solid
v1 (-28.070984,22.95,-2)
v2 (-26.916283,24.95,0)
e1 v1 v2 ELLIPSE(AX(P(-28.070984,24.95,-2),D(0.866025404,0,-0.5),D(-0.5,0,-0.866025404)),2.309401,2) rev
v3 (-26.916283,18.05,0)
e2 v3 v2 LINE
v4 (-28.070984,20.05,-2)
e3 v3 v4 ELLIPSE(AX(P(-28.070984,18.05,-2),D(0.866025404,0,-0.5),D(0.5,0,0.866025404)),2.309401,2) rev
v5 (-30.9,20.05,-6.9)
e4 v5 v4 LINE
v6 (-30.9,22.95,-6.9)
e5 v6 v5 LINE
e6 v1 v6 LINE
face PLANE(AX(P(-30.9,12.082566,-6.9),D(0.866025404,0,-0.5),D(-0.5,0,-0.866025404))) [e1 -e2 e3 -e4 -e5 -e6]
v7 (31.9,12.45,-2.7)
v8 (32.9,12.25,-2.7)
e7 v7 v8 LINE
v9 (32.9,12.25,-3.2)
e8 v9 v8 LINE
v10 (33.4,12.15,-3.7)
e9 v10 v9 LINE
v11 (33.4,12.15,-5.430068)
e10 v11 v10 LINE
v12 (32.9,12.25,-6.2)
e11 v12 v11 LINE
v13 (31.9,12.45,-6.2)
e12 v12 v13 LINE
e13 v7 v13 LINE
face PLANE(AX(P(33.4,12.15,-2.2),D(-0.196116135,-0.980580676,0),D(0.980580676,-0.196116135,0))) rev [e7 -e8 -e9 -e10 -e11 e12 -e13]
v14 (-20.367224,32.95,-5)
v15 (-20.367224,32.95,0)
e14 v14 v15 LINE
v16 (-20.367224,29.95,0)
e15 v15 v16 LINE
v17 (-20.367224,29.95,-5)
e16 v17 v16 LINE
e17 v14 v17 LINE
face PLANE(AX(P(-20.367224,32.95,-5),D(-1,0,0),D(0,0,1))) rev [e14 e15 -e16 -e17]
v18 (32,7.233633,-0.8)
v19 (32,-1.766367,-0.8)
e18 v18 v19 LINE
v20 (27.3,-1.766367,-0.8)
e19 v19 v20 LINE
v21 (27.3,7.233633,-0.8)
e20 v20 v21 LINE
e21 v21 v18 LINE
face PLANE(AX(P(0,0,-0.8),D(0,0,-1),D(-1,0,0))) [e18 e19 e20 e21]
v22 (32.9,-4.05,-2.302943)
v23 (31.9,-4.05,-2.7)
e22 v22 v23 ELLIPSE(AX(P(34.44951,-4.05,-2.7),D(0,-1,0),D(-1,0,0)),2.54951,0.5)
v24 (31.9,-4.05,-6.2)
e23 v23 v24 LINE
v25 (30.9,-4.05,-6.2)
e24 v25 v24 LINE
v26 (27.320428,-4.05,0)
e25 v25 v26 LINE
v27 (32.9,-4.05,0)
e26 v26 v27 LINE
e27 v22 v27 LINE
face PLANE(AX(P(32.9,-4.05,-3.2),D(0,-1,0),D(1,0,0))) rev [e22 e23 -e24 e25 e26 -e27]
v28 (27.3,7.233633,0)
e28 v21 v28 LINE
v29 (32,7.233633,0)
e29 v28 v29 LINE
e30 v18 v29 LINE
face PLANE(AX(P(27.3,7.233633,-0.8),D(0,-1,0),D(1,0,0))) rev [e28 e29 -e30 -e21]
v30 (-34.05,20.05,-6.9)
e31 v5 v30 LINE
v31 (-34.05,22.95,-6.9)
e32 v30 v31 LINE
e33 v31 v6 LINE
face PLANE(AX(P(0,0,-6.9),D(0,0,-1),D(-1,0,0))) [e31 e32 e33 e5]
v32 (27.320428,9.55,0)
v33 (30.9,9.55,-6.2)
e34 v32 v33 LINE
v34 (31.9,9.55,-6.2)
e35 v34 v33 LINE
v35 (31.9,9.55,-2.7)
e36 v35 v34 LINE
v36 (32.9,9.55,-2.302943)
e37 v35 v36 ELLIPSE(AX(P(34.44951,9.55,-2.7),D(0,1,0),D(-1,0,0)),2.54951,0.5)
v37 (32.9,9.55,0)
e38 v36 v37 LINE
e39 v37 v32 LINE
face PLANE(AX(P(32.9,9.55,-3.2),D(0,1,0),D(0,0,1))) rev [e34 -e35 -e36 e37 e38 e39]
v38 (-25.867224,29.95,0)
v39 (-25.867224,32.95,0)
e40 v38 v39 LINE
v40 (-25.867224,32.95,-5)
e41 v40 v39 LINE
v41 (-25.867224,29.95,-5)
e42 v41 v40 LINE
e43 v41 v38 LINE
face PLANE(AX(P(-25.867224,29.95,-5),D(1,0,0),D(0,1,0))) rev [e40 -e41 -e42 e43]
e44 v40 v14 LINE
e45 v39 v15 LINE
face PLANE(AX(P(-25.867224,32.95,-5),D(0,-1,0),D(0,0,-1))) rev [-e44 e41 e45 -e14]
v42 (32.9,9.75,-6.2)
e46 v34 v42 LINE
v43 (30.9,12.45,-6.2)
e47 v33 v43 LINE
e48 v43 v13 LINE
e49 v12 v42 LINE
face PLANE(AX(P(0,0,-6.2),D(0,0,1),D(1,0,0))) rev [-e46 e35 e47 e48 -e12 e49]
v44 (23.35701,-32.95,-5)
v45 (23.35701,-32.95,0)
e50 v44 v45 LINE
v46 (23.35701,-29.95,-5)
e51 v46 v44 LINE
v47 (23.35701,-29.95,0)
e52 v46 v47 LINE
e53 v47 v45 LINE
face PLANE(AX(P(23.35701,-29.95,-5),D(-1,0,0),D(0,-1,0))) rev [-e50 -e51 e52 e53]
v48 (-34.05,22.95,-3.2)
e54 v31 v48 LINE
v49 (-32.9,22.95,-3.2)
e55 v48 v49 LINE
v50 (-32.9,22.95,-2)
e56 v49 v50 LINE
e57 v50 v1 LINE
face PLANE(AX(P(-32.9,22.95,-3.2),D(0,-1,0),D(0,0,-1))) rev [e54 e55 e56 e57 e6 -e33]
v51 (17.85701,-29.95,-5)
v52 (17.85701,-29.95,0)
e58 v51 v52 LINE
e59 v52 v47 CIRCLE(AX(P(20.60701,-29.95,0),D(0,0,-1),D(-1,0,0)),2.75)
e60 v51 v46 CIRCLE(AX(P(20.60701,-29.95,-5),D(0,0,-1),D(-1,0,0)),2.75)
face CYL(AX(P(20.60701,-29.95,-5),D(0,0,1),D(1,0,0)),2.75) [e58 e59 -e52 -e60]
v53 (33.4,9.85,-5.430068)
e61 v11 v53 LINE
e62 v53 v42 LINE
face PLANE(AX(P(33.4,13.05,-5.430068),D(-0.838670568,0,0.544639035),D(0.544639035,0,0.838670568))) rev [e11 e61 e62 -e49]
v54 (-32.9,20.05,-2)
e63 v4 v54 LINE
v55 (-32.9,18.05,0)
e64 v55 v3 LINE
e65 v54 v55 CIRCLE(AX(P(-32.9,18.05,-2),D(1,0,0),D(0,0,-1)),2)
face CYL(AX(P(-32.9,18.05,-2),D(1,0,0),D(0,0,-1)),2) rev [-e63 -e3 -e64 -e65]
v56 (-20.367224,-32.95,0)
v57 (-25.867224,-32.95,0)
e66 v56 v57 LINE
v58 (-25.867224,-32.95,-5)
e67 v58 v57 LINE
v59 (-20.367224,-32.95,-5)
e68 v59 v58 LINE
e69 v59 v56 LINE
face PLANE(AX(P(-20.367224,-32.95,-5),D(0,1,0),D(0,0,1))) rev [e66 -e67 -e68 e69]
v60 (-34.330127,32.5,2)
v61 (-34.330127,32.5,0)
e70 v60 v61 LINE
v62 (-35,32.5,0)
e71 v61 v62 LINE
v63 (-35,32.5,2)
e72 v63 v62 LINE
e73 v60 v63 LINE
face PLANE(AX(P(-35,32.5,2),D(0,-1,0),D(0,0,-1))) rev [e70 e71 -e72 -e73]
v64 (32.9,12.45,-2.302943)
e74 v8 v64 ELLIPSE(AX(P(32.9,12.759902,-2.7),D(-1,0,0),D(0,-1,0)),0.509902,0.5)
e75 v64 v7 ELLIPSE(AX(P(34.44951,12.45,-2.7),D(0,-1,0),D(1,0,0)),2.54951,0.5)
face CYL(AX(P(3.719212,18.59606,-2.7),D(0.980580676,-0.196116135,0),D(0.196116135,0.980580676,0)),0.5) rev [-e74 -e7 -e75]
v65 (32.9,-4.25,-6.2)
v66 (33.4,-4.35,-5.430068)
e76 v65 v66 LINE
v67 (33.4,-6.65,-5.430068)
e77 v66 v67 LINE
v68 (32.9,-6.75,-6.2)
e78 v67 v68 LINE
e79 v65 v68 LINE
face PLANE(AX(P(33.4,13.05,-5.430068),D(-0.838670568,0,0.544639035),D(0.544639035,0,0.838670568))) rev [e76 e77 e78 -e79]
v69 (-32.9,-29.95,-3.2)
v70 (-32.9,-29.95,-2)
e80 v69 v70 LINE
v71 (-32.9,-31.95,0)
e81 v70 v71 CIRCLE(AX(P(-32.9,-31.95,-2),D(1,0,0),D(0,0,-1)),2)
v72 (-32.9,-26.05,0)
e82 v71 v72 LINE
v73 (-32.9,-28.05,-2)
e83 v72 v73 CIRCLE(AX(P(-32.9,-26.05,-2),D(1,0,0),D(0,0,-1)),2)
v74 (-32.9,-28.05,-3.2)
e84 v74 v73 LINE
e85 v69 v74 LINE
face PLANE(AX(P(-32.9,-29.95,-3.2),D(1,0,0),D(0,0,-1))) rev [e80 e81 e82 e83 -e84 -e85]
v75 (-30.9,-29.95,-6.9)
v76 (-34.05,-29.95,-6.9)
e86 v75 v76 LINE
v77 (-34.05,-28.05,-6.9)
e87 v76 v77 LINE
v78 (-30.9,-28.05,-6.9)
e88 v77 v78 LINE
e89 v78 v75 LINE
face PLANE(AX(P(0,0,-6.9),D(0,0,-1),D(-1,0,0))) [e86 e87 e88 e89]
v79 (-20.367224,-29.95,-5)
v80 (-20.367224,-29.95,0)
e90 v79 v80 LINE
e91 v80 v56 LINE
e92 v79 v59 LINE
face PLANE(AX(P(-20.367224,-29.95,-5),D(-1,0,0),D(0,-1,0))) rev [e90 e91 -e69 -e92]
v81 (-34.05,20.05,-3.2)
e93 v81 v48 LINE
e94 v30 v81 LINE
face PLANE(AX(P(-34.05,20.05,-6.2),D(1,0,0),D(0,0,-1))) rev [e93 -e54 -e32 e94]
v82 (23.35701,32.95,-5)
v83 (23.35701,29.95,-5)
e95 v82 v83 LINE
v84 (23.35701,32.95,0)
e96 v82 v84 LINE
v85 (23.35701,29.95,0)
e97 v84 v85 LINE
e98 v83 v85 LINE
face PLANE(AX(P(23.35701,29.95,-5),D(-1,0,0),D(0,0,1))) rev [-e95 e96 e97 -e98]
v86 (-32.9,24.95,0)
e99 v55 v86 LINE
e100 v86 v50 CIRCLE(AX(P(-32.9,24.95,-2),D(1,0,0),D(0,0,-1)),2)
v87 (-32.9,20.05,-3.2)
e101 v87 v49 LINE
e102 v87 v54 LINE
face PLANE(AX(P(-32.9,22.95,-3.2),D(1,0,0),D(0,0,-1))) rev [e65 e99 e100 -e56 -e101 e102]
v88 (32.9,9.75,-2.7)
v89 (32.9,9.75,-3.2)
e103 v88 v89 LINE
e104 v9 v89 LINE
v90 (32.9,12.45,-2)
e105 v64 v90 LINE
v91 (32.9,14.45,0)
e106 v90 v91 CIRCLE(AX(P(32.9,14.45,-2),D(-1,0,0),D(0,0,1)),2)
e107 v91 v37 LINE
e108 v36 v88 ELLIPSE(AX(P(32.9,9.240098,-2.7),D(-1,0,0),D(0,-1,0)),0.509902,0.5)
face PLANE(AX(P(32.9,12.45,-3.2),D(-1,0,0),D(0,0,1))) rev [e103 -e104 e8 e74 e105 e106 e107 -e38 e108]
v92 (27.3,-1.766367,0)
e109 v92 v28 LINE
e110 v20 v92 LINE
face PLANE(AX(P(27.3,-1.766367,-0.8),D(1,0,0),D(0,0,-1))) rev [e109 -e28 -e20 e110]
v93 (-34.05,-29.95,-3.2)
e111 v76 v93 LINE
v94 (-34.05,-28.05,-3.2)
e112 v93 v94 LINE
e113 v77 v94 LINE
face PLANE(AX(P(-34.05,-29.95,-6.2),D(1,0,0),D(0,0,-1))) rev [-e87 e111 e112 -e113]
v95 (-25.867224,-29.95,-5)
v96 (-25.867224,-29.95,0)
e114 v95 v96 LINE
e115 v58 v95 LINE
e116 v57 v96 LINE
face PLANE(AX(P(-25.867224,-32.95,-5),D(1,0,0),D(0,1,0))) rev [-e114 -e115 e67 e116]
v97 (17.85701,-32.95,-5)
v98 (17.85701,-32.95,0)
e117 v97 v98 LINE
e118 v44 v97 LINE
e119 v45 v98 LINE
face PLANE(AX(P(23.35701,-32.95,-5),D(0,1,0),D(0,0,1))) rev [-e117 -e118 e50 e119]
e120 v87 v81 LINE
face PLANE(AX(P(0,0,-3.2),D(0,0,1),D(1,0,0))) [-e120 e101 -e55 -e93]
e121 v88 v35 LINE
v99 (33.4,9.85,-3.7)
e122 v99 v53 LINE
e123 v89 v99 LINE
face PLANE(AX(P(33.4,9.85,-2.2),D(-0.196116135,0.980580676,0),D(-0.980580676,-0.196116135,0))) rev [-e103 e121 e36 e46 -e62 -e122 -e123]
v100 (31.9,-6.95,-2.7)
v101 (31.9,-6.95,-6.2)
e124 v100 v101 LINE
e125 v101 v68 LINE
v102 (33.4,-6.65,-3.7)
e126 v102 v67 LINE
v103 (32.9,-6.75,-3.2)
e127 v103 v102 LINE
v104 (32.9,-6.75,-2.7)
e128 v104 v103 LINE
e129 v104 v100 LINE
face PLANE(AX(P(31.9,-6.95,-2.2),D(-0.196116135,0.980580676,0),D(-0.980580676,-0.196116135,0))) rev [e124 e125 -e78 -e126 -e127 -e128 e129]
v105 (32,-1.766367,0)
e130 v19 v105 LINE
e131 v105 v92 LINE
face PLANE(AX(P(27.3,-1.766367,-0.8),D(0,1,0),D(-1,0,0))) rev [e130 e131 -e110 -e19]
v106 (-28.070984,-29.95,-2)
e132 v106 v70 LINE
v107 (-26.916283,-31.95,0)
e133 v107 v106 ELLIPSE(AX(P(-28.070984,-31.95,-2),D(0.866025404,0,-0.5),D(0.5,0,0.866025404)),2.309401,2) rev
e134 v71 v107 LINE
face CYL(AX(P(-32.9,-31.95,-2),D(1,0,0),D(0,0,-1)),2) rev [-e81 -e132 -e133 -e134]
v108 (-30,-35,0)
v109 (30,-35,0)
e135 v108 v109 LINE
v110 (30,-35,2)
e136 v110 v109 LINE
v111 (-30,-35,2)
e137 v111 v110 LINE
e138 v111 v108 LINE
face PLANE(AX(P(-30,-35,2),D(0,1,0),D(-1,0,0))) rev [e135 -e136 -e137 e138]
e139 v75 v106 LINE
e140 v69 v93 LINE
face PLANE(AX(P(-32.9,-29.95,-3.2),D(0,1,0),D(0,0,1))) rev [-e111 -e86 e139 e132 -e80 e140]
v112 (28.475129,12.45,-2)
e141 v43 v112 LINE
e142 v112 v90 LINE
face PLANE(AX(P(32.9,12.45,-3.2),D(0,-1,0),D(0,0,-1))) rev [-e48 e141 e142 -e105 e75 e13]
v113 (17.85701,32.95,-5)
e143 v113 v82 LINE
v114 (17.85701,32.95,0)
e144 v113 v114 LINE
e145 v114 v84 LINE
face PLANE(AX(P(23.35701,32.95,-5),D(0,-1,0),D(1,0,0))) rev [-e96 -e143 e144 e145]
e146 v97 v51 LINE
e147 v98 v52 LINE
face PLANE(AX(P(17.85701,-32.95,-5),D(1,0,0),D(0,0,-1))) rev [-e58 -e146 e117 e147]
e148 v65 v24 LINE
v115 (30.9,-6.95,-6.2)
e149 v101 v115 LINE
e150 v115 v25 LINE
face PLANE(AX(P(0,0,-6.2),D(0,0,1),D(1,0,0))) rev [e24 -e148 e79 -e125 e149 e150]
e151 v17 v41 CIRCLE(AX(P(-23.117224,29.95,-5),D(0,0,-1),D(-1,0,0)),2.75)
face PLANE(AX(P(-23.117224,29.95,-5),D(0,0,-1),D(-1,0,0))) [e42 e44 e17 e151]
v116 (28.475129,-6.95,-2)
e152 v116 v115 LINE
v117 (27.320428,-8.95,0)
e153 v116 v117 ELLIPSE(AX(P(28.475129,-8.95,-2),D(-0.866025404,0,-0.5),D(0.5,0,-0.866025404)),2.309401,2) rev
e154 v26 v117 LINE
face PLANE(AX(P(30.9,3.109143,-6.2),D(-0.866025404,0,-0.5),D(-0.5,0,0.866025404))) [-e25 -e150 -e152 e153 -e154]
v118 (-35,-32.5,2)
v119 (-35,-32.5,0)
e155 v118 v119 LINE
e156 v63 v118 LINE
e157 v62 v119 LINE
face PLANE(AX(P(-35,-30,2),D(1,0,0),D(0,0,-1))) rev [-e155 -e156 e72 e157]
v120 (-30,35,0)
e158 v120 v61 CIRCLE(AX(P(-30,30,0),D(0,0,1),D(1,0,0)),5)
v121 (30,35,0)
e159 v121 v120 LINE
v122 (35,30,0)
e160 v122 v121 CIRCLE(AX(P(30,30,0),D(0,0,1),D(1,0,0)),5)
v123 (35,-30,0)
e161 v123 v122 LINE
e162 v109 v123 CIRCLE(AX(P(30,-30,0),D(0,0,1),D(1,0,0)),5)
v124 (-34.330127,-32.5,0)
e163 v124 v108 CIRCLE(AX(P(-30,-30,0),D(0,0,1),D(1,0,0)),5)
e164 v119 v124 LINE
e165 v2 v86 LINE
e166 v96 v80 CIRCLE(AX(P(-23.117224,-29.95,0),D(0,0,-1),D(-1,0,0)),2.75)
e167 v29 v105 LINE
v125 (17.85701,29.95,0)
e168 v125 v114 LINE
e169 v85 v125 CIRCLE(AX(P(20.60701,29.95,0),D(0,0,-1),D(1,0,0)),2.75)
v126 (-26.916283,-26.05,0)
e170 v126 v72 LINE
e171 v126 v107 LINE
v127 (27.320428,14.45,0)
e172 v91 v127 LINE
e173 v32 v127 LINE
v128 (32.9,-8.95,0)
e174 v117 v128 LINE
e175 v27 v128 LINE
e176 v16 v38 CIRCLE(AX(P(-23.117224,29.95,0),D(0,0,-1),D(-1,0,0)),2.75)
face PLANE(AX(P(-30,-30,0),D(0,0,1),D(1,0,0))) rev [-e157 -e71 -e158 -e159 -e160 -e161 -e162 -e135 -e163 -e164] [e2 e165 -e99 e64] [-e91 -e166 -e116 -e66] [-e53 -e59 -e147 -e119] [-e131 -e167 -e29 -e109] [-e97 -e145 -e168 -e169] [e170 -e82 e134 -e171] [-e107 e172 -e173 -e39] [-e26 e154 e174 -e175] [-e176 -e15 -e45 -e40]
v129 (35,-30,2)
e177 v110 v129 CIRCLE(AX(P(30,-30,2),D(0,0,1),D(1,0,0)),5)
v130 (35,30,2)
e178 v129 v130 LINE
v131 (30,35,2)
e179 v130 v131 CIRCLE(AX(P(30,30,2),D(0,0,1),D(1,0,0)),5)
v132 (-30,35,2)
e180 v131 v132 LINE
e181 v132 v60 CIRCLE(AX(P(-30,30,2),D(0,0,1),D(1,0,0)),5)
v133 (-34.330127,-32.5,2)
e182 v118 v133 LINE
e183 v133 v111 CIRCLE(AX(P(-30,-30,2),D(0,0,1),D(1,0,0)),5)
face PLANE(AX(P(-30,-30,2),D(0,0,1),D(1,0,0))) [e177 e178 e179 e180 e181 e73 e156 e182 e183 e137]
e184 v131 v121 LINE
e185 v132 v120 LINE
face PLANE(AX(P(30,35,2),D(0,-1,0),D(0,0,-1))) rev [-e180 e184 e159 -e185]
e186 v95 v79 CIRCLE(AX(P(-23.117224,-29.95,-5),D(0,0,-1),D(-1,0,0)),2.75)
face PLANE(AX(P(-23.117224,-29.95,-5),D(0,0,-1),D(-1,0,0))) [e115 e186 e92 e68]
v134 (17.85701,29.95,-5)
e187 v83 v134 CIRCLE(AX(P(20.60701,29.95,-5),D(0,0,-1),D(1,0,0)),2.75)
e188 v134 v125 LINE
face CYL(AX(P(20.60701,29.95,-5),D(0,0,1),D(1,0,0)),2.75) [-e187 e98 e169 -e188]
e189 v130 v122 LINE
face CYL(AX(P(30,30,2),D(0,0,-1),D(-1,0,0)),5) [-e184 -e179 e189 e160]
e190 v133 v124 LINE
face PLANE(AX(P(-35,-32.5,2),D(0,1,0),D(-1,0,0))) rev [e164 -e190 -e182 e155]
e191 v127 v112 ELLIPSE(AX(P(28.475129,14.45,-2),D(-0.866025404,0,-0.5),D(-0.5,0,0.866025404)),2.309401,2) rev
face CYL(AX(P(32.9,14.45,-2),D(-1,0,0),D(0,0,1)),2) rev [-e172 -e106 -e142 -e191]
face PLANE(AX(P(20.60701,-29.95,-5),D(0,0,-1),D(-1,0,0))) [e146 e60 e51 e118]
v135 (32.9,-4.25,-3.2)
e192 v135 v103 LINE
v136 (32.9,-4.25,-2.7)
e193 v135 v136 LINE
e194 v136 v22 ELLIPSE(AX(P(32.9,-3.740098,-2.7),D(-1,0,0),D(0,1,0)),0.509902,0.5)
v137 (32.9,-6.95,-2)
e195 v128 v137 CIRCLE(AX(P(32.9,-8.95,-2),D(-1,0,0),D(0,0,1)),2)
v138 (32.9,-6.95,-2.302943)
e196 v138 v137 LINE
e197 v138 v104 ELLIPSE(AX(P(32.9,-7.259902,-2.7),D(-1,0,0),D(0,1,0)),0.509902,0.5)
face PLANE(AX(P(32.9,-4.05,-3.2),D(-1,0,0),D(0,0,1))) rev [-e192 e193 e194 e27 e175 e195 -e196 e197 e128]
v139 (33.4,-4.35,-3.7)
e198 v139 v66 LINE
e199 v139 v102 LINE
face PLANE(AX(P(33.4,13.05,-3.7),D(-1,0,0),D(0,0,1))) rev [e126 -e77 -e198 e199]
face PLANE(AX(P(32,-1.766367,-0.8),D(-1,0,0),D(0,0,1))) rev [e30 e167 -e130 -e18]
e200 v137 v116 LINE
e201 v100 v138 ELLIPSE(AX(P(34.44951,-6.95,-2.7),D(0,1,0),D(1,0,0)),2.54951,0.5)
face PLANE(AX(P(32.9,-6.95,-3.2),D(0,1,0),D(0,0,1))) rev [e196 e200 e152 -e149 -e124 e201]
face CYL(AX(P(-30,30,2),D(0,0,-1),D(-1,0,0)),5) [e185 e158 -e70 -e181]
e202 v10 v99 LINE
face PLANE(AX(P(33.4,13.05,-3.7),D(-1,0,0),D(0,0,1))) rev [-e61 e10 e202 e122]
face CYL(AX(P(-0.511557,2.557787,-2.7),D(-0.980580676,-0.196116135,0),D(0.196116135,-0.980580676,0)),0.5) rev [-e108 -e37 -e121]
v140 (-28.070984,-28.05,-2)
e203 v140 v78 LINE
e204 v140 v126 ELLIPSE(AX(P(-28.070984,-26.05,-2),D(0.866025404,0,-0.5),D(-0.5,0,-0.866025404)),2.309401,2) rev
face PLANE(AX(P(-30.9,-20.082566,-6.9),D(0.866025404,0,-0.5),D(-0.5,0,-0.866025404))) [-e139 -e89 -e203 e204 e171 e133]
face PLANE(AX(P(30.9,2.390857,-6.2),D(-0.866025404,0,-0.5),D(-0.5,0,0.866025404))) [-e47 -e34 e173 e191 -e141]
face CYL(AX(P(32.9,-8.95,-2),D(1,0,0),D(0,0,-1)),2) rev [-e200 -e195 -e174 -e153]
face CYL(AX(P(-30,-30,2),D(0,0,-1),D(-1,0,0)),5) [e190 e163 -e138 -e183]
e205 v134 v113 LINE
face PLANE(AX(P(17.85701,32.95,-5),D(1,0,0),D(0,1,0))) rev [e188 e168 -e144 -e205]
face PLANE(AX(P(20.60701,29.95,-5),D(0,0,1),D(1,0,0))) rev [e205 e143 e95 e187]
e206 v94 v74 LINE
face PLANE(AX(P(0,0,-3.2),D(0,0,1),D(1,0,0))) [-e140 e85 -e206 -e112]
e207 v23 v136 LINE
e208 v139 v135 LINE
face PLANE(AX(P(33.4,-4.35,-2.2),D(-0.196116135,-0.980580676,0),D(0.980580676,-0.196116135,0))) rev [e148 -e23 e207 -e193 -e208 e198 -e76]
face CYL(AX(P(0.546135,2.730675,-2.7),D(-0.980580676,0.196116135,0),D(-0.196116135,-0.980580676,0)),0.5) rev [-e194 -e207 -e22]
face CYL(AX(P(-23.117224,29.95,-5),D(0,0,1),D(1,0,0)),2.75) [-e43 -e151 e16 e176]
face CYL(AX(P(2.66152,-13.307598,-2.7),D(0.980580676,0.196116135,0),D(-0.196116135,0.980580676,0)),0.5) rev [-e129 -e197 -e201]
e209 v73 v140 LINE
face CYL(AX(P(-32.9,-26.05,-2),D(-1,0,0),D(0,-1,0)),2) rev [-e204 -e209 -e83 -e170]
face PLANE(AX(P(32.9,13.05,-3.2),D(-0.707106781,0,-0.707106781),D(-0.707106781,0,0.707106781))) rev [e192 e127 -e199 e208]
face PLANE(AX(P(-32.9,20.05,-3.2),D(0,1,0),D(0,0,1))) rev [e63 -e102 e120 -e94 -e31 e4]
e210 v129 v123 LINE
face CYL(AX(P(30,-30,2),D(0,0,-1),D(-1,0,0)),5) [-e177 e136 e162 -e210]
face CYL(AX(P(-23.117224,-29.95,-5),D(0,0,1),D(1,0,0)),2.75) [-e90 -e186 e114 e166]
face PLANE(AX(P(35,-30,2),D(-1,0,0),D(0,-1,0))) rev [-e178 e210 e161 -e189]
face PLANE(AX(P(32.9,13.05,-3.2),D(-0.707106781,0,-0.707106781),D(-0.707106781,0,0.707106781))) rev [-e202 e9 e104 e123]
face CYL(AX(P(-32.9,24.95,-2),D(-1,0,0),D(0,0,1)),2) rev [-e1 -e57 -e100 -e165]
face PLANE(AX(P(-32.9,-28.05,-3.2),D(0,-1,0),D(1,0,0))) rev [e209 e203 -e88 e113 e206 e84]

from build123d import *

# Parameters (mm, degrees)
EXTRUDE_1_DEPTH     = 2
EXTRUDE_2_DEPTH     = 5
SKETCH_3_W          = 2
SKETCH_3_H          = 1.9
SKETCH_3_H_2        = 2.9
EXTRUDE_3_DEPTH     = 3.2
SKETCH_4_W          = 3.15
SKETCH_4_H          = 1.9
SKETCH_4_H_2        = 2.9
SKETCH_4_W_2        = 3
EXTRUDE_4_DEPTH     = 3
SKETCH_6_W          = 3.15
SKETCH_6_H          = 2.9
SKETCH_6_H_2        = 1.9
EXTRUDE_5_DEPTH     = 0.7
EXTRUDE_6_DEPTH     = 1.9
EXTRUDE_7_DEPTH     = 2.9
EXTRUDE_8_DEPTH     = 2.9
EXTRUDE_9_DEPTH     = 2.9
FILLET_1_R          = 2
CUT_EXTRUDE_1_REACH = 61.364
SKETCH_12_W         = 4.7
SKETCH_12_H         = 9
EXTRUDE_10_DEPTH    = 0.8
CHAMFER_1_SIZE      = 1
CUT_EXTRUDE_2_DEPTH = 20
CUT_EXTRUDE_3_DEPTH = 4
FILLET_2_R          = 0.5


with BuildPart() as part:
    # 草图1 → 凸台-拉伸1 (new body)
    with BuildSketch(Plane.XY):
        with BuildLine():
            Line((-30, -35), (30, -35))
            ThreePointArc((30, -35), (33.535533906, -33.535533906), (35, -30))
            Line((35, -30), (35, 30))
            ThreePointArc((35, 30), (33.535533906, 33.535533906), (30, 35))
            Line((30, 35), (-30, 35))
            ThreePointArc((-30, 35), (-32.5, 34.330127019), (-34.330127019, 32.5))
            Line((-34.330127019, 32.5), (-35, 32.5))
            Line((-35, 32.5), (-35, 30))
            Line((-35, 30), (-35, -30))
            Line((-35, -30), (-35, -32.5))
            Line((-35, -32.5), (-34.330127019, -32.5))
            ThreePointArc((-34.330127019, -32.5), (-32.5, -34.330127019), (-30, -35))
        make_face()
    extrude(amount=EXTRUDE_1_DEPTH)

    # 草图2 → 凸台-拉伸2 (add)
    with BuildSketch(Plane(origin=(0, 0, 0), x_dir=(-1, 0, 0), z_dir=(0, 0, -1))):
        with BuildLine():
            Line((25.867224141, -32.95), (25.867224141, -29.95))
            ThreePointArc((25.867224141, -29.95), (23.117224141, -27.2), (20.367224141, -29.95))
            Line((20.367224141, -29.95), (20.367224141, -32.95))
            Line((20.367224141, -32.95), (25.867224141, -32.95))
        make_face()
        with BuildLine():
            Line((20.367224141, 32.95), (20.367224141, 29.95))
            ThreePointArc((20.367224141, 29.95), (23.117224141, 27.2), (25.867224141, 29.95))
            Line((25.867224141, 29.95), (25.867224141, 32.95))
            Line((25.867224141, 32.95), (20.367224141, 32.95))
        make_face()
        with BuildLine():
            Line((-23.357009719, -29.95), (-23.357009719, -32.95))
            Line((-23.357009719, -32.95), (-17.857009719, -32.95))
            Line((-17.857009719, -32.95), (-17.857009719, -29.95))
            ThreePointArc((-17.857009719, -29.95), (-20.607009719, -27.2), (-23.357009719, -29.95))
        make_face()
        with BuildLine():
            Line((-23.357009719, 32.95), (-17.857009719, 32.95))
            Line((-17.857009719, 32.95), (-17.857009719, 29.95))
            ThreePointArc((-17.857009719, 29.95), (-20.607009719, 27.2), (-23.357009719, 29.95))
            Line((-23.357009719, 29.95), (-23.357009719, 32.95))
        make_face()
    extrude(amount=EXTRUDE_2_DEPTH)

    # 草图3 → 凸台-拉伸3 (add)
    with BuildSketch(Plane(origin=(0, 0, 0), x_dir=(-1, 0, 0), z_dir=(0, 0, -1))):
        with Locations((31.9, -29)):
            Rectangle(SKETCH_3_W, SKETCH_3_H)
        with Locations((31.9, 21.5)):
            Rectangle(SKETCH_3_W, SKETCH_3_H_2)
        with Locations((-31.9, -5.5)):
            Rectangle(SKETCH_3_W, SKETCH_3_H_2)
        with Locations((-31.9, 11)):
            Rectangle(SKETCH_3_W, SKETCH_3_H_2)
    extrude(amount=EXTRUDE_3_DEPTH)

    # 草图4 → 凸台-拉伸4 (add)
    with BuildSketch(Plane(origin=(0, 0, -3.2), x_dir=(-1, 0, 0), z_dir=(0, 0, -1))):
        with Locations((32.475, -29)):
            Rectangle(SKETCH_4_W, SKETCH_4_H)
        with Locations((32.475, 21.5)):
            Rectangle(SKETCH_4_W, SKETCH_4_H_2)
        with Locations((-32.4, -5.5)):
            Rectangle(SKETCH_4_W_2, SKETCH_4_H_2)
        with Locations((-32.4, 11)):
            Rectangle(SKETCH_4_W_2, SKETCH_4_H_2)
    extrude(amount=EXTRUDE_4_DEPTH)

    # 草图6 → 凸台-拉伸5 (add)
    with BuildSketch(Plane(origin=(0, 0, -6.2), x_dir=(-1, 0, 0), z_dir=(0, 0, -1))):
        with Locations((32.475, 21.5)):
            Rectangle(SKETCH_6_W, SKETCH_6_H)
        with Locations((32.475, -29)):
            Rectangle(SKETCH_6_W, SKETCH_6_H_2)
    extrude(amount=EXTRUDE_5_DEPTH)

    # 草图7 → 凸台-拉伸6 (add)
    with BuildSketch(Plane.XZ.offset(29.95)):
        Polygon((-30.9, -6.9), (-26.916283143, 0), (-30.9, 0), align=None)
    extrude(amount=-EXTRUDE_6_DEPTH)

    # 草图8 → 凸台-拉伸7 (add)
    with BuildSketch(Plane(origin=(0, 22.95, 0), x_dir=(1, 0, 0), z_dir=(0, 1, 0))):
        Polygon((-30.9, 6.9), (-26.916283143, 0), (-30.9, 0), align=None)
    extrude(amount=-EXTRUDE_7_DEPTH)

    # 草图9 → 凸台-拉伸8 (add)
    with BuildSketch(Plane(origin=(0, 12.45, 0), x_dir=(1, 0, 0), z_dir=(0, 1, 0))):
        Polygon((30.9, 6.2), (27.320428331, 0), (30.9, 0), align=None)
    extrude(amount=-EXTRUDE_8_DEPTH)

    # 草图10 → 凸台-拉伸9 (add)
    with BuildSketch(Plane.XZ.offset(6.95)):
        Polygon((30.9, -6.2), (27.320428331, 0), (30.9, 0), align=None)
    extrude(amount=-EXTRUDE_9_DEPTH)

    # 圆角1
    fillet_1_edges = [part.edges().sort_by_distance(p)[0] for p in [
        (-29.908141571, 22.95, 0),
        (-29.908141571, 20.05, 0),
        (30.110214166, -6.95, 0),
        (30.110214166, 12.45, 0),
        (-29.908141571, -28.05, 0),
        (-29.908141571, -29.95, 0),
    ]]
    fillet(fillet_1_edges, radius=FILLET_1_R)

    # 切除-拉伸1: up to this face of the body (flat: up to its plane)
    cut_extrude_1_end = Plane(part.part.faces().sort_by_distance((31.614518318, -6.95, -3.993006547))[0])
    # 草图11 → 切除-拉伸1 (cut, up to the picked face)
    with BuildSketch(Plane(origin=(0, 12.45, 0), x_dir=(1, 0, 0), z_dir=(0, 1, 0)), mode=Mode.PRIVATE) as cut_extrude_1_sk1:
        Polygon((33.4, 3.2), (33.9, 3.7), (33.9, 3.2), align=None)
    cut_extrude_1_tool1 = split(extrude(cut_extrude_1_sk1.sketch, amount=-CUT_EXTRUDE_1_REACH, mode=Mode.PRIVATE), bisect_by=cut_extrude_1_end, keep=Keep.BOTH, mode=Mode.PRIVATE)
    add(cut_extrude_1_tool1.solids().sort_by(Axis((33.733333, 12.45, -3.366667), (0, -1, 0)))[0], mode=Mode.SUBTRACT)

    # 草图12 → 凸台-拉伸10 (add)
    with BuildSketch(Plane(origin=(0, 0, 0), x_dir=(-1, 0, 0), z_dir=(0, 0, -1))):
        with Locations((-29.65, 2.733632703)):
            Rectangle(SKETCH_12_W, SKETCH_12_H)
    extrude(amount=EXTRUDE_10_DEPTH)

    # 倒角1
    chamfer_1_edges = [part.edges().sort_by_distance(p)[0] for p in [
        (33.9, -5.5, -6.2),
        (33.9, 11, -6.2),
    ]]
    chamfer(chamfer_1_edges, length=CHAMFER_1_SIZE)

    # 草图13 → 切除-拉伸2 (cut)
    with BuildSketch(Plane.XZ.offset(6.95)):
        Polygon((32.9, -3.2), (33.4, -3.7), (33.4, -5.430067518), (32.9, -6.2), (33.9, -5.2), (33.9, -3.7), (33.4, -3.2), align=None)
    extrude(amount=-CUT_EXTRUDE_2_DEPTH, mode=Mode.SUBTRACT)

    # 草图14 → 切除-拉伸3 (cut)
    with BuildSketch(Plane(origin=(0, 0, -6.2), x_dir=(-1, 0, 0), z_dir=(0, 0, -1))):
        Polygon((-33.4, 12.15), (-31.9, 12.45), (-33.4, 12.45), align=None)
        Polygon((-33.4, 9.55), (-33.4, 9.85), (-31.9, 9.55), align=None)
        Polygon((-33.4, -4.05), (-33.4, -4.35), (-31.9, -4.05), align=None)
        Polygon((-33.4, -6.95), (-31.9, -6.95), (-33.4, -6.65), align=None)
    extrude(amount=-CUT_EXTRUDE_3_DEPTH, mode=Mode.SUBTRACT)

    # 圆角2
    # the kernel refuses this fillet: 0.5 mm, written as the material it adds along each edge
    with BuildSketch(Plane(origin=(34.125725845, 9.995145169, -2.2), x_dir=(0, 0, -1), z_dir=(-0.9805806756909201, -0.1961161351381845, 0))) as fillet_2_piece_1_section:
        with BuildLine():
            CenterArc((FILLET_2_R, FILLET_2_R), FILLET_2_R, 180, 90)
            Line((0, FILLET_2_R), (0, 0))
            Line((0, 0), (FILLET_2_R, 0))
        make_face()
    fillet_2_piece_1 = extrude(amount=3.519803903, mode=Mode.PRIVATE)
    fillet_2_piece_1 = split(fillet_2_piece_1, bisect_by=Plane(origin=(32.9, 9.624038043, -2.351425579), z_dir=(-1, 0, 0)), keep=Keep.TOP, mode=Mode.PRIVATE)
    fillet_2_piece_1 = split(fillet_2_piece_1, bisect_by=Plane(origin=(32.529809776, 9.55, -2.351425579), z_dir=(0, 1, 0)), keep=Keep.TOP, mode=Mode.PRIVATE)
    add(fillet_2_piece_1)
    with BuildSketch(Plane(origin=(34.125725845, 12.004854831, -2.2), x_dir=(0.1961161351381845, 0.9805806756909201, 0), z_dir=(-0.9805806756909201, 0.1961161351381845, 0))) as fillet_2_piece_2_section:
        with BuildLine():
            CenterArc((FILLET_2_R, FILLET_2_R), FILLET_2_R, 180, 90)
            Line((0, FILLET_2_R), (0, 0))
            Line((0, 0), (FILLET_2_R, 0))
        make_face()
    fillet_2_piece_2 = extrude(amount=3.519803903, mode=Mode.PRIVATE)
    fillet_2_piece_2 = split(fillet_2_piece_2, bisect_by=Plane(origin=(32.9, 12.375961957, -2.351425579), z_dir=(-1, 0, 0)), keep=Keep.TOP, mode=Mode.PRIVATE)
    fillet_2_piece_2 = split(fillet_2_piece_2, bisect_by=Plane(origin=(32.529809778, 12.45, -2.351425579), z_dir=(0, -1, 0)), keep=Keep.TOP, mode=Mode.PRIVATE)
    add(fillet_2_piece_2)
    with BuildSketch(Plane(origin=(34.125725845, -4.495145169, -2.2), x_dir=(0, 0, -1), z_dir=(-0.9805806756909202, 0.1961161351381839, 0))) as fillet_2_piece_3_section:
        with BuildLine():
            CenterArc((FILLET_2_R, -FILLET_2_R), FILLET_2_R, 90, 90)
            Line((0, -FILLET_2_R), (0, 0))
            Line((0, 0), (FILLET_2_R, 0))
        make_face()
    fillet_2_piece_3 = extrude(amount=3.519803903, mode=Mode.PRIVATE)
    fillet_2_piece_3 = split(fillet_2_piece_3, bisect_by=Plane(origin=(32.529809776, -4.05, -2.351425579), z_dir=(0, -1, 0)), keep=Keep.TOP, mode=Mode.PRIVATE)
    fillet_2_piece_3 = split(fillet_2_piece_3, bisect_by=Plane(origin=(32.9, -4.124038043, -2.351425579), z_dir=(-1, 0, 0)), keep=Keep.TOP, mode=Mode.PRIVATE)
    add(fillet_2_piece_3)
    with BuildSketch(Plane(origin=(30.674274155, -7.195145169, -2.2), x_dir=(0, 0, -1), z_dir=(0.9805806756909202, 0.1961161351381839, 0))) as fillet_2_piece_4_section:
        with BuildLine():
            CenterArc((FILLET_2_R, -FILLET_2_R), FILLET_2_R, 90, 90)
            Line((0, -FILLET_2_R), (0, 0))
            Line((0, 0), (FILLET_2_R, 0))
        make_face()
    fillet_2_piece_4 = extrude(amount=3.519803903, mode=Mode.PRIVATE)
    fillet_2_piece_4 = split(fillet_2_piece_4, bisect_by=Plane(origin=(32.9, -6.875961957, -2.351425579), z_dir=(-1, 0, 0)), keep=Keep.TOP, mode=Mode.PRIVATE)
    fillet_2_piece_4 = split(fillet_2_piece_4, bisect_by=Plane(origin=(32.529809776, -6.95, -2.351425579), z_dir=(0, 1, 0)), keep=Keep.TOP, mode=Mode.PRIVATE)
    add(fillet_2_piece_4)


solid = part.part
